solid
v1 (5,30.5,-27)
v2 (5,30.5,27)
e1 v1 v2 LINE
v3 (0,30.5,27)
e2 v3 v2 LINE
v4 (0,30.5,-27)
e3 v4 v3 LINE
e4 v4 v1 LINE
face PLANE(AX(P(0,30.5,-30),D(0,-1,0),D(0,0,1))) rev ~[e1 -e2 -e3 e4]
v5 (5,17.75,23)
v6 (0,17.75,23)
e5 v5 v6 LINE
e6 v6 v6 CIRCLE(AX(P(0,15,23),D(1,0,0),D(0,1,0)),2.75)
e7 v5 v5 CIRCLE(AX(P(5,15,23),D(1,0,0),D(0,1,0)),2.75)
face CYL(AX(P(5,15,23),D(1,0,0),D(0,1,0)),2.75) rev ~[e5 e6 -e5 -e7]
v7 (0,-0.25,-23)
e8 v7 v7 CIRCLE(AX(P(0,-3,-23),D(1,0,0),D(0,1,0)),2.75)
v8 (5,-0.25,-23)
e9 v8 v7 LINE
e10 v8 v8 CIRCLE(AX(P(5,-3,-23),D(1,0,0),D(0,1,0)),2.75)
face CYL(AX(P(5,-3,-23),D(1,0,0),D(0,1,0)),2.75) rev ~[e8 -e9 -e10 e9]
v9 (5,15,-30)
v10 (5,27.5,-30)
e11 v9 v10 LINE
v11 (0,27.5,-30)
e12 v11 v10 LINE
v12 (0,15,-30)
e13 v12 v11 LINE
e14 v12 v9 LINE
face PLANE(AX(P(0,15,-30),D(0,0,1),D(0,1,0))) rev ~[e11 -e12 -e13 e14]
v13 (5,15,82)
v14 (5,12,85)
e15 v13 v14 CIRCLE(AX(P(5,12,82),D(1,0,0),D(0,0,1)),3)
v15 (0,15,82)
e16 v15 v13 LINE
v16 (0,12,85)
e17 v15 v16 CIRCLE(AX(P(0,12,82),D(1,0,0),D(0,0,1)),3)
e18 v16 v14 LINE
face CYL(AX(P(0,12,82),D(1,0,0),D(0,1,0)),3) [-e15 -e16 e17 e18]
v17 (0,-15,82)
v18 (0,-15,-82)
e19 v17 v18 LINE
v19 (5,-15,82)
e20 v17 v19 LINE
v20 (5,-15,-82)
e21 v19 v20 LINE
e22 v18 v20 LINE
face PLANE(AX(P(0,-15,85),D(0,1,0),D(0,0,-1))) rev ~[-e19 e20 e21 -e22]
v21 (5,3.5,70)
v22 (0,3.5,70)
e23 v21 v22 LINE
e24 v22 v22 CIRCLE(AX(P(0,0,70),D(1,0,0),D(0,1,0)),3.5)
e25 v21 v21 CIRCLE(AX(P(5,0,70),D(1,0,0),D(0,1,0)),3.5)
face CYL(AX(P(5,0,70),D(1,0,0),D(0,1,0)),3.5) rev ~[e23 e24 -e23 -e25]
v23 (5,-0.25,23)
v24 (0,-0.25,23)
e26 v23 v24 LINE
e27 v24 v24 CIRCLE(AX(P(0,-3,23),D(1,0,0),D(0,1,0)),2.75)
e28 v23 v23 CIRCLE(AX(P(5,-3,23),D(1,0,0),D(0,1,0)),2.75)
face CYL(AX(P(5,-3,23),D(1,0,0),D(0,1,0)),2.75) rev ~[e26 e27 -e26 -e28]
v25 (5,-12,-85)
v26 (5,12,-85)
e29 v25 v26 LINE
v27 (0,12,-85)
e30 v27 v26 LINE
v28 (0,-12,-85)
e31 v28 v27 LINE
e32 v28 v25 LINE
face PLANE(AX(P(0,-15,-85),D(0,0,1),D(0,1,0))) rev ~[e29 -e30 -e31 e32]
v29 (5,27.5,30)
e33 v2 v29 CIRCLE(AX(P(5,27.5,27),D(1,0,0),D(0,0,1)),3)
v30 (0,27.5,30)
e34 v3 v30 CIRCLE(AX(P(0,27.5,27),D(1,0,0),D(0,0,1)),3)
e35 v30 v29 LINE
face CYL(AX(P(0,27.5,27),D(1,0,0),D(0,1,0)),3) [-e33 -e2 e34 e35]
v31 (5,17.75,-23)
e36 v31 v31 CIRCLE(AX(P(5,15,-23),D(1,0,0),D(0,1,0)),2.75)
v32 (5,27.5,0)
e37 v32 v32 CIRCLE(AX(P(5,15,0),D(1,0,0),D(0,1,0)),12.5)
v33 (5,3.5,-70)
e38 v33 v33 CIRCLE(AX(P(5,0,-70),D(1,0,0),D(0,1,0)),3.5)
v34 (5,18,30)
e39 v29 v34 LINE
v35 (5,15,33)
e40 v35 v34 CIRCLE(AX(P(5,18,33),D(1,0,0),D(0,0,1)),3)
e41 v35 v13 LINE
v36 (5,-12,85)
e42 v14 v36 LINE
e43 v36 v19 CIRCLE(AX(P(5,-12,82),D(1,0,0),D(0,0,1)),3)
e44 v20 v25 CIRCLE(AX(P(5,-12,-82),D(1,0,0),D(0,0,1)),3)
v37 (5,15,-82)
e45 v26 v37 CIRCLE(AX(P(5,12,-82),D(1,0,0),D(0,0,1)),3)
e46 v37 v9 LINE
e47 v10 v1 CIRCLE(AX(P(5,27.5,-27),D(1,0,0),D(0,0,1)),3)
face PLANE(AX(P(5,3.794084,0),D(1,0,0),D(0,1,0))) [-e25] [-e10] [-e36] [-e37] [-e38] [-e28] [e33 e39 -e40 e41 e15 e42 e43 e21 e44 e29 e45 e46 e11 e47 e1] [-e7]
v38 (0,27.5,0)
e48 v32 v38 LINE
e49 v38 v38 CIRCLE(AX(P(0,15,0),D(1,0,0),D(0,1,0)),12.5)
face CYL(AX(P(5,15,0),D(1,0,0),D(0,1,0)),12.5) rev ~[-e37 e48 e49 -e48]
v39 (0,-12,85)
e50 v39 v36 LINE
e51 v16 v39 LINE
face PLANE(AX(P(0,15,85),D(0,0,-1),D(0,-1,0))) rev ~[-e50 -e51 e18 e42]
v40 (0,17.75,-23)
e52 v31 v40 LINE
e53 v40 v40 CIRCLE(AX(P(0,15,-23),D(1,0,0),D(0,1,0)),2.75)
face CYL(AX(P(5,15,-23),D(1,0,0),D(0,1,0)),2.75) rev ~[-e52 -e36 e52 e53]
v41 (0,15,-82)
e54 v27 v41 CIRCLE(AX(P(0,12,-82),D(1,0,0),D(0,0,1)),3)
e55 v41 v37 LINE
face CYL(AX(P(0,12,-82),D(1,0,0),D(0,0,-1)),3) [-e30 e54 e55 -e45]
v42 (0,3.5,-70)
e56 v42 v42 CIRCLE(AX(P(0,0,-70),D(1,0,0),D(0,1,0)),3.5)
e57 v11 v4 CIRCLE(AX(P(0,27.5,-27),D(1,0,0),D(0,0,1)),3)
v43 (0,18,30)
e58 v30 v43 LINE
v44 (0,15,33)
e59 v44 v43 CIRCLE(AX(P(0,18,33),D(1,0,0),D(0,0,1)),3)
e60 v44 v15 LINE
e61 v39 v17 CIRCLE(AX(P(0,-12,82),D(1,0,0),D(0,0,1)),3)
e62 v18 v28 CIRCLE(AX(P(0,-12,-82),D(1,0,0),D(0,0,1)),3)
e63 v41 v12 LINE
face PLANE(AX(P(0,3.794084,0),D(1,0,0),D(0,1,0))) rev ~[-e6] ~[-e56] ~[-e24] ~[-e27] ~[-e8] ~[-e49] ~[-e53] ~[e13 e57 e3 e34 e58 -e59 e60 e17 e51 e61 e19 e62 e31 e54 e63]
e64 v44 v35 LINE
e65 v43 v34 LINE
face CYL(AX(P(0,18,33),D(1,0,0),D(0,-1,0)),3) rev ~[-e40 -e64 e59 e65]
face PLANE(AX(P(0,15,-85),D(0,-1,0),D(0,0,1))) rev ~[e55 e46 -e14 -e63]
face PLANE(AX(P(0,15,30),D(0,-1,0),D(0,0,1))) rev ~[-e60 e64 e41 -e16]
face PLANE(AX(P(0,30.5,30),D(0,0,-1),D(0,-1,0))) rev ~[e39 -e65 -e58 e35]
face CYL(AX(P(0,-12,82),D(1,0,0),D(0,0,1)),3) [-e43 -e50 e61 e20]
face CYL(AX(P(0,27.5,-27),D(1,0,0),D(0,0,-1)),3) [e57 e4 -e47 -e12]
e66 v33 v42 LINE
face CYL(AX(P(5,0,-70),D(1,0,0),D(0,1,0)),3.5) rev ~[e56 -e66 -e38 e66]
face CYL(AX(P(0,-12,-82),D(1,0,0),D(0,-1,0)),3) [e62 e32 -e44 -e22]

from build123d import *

# Parameters (mm, degrees)
F1_DEPTH = 5
F2_R     = 3
F3_R     = 3.5
F4_DEPTH = 5
F6_R     = 12.5
F6_R_2   = 2.75
F7_DEPTH = 5


# Not quite as in the source:
# - two fillets or chamfers of one size are made in one step


with BuildPart() as f1:
    # F0 (on Right) → F1 (new body)
    with BuildSketch(Plane.YZ):
        Polygon((15, 30), (15, 85), (-15, 85), (-15, -85), (15, -85), (15, -30), (30.5, -30), (30.5, 30), align=None)
    extrude(amount=F1_DEPTH)

    # F2
    f2_edges = [f1.edges().sort_by_distance(p)[0] for p in [
        (2.5, -15, 85),
        (2.5, 15, 85),
        (2.5, -15, -85),
        (2.5, 15, 30),
        (2.5, 15, -85),
        (2.5, 30.5, -30),
        (2.5, 30.5, 30),
    ]]
    fillet(f2_edges, radius=F2_R)

    # F3 (on face) → F4 (cut)
    with BuildSketch(Plane.YZ.offset(5)):
        with Locations((0, 70)):
            Circle(F3_R)
        with Locations((0, -70)):
            Circle(F3_R)
    extrude(amount=-F4_DEPTH, mode=Mode.SUBTRACT)

    # F6 (on face) → F7 (cut)
    with BuildSketch(Plane.YZ.offset(5)):
        with Locations((15, 0)):
            Circle(F6_R)
        with Locations((15, 23)):
            Circle(F6_R_2)
        with Locations((15, -23)):
            Circle(F6_R_2)
        with Locations((-3, -23)):
            Circle(F6_R_2)
        with Locations((-3, 23)):
            Circle(F6_R_2)
    extrude(amount=-F7_DEPTH, mode=Mode.SUBTRACT)


solid = f1.part
